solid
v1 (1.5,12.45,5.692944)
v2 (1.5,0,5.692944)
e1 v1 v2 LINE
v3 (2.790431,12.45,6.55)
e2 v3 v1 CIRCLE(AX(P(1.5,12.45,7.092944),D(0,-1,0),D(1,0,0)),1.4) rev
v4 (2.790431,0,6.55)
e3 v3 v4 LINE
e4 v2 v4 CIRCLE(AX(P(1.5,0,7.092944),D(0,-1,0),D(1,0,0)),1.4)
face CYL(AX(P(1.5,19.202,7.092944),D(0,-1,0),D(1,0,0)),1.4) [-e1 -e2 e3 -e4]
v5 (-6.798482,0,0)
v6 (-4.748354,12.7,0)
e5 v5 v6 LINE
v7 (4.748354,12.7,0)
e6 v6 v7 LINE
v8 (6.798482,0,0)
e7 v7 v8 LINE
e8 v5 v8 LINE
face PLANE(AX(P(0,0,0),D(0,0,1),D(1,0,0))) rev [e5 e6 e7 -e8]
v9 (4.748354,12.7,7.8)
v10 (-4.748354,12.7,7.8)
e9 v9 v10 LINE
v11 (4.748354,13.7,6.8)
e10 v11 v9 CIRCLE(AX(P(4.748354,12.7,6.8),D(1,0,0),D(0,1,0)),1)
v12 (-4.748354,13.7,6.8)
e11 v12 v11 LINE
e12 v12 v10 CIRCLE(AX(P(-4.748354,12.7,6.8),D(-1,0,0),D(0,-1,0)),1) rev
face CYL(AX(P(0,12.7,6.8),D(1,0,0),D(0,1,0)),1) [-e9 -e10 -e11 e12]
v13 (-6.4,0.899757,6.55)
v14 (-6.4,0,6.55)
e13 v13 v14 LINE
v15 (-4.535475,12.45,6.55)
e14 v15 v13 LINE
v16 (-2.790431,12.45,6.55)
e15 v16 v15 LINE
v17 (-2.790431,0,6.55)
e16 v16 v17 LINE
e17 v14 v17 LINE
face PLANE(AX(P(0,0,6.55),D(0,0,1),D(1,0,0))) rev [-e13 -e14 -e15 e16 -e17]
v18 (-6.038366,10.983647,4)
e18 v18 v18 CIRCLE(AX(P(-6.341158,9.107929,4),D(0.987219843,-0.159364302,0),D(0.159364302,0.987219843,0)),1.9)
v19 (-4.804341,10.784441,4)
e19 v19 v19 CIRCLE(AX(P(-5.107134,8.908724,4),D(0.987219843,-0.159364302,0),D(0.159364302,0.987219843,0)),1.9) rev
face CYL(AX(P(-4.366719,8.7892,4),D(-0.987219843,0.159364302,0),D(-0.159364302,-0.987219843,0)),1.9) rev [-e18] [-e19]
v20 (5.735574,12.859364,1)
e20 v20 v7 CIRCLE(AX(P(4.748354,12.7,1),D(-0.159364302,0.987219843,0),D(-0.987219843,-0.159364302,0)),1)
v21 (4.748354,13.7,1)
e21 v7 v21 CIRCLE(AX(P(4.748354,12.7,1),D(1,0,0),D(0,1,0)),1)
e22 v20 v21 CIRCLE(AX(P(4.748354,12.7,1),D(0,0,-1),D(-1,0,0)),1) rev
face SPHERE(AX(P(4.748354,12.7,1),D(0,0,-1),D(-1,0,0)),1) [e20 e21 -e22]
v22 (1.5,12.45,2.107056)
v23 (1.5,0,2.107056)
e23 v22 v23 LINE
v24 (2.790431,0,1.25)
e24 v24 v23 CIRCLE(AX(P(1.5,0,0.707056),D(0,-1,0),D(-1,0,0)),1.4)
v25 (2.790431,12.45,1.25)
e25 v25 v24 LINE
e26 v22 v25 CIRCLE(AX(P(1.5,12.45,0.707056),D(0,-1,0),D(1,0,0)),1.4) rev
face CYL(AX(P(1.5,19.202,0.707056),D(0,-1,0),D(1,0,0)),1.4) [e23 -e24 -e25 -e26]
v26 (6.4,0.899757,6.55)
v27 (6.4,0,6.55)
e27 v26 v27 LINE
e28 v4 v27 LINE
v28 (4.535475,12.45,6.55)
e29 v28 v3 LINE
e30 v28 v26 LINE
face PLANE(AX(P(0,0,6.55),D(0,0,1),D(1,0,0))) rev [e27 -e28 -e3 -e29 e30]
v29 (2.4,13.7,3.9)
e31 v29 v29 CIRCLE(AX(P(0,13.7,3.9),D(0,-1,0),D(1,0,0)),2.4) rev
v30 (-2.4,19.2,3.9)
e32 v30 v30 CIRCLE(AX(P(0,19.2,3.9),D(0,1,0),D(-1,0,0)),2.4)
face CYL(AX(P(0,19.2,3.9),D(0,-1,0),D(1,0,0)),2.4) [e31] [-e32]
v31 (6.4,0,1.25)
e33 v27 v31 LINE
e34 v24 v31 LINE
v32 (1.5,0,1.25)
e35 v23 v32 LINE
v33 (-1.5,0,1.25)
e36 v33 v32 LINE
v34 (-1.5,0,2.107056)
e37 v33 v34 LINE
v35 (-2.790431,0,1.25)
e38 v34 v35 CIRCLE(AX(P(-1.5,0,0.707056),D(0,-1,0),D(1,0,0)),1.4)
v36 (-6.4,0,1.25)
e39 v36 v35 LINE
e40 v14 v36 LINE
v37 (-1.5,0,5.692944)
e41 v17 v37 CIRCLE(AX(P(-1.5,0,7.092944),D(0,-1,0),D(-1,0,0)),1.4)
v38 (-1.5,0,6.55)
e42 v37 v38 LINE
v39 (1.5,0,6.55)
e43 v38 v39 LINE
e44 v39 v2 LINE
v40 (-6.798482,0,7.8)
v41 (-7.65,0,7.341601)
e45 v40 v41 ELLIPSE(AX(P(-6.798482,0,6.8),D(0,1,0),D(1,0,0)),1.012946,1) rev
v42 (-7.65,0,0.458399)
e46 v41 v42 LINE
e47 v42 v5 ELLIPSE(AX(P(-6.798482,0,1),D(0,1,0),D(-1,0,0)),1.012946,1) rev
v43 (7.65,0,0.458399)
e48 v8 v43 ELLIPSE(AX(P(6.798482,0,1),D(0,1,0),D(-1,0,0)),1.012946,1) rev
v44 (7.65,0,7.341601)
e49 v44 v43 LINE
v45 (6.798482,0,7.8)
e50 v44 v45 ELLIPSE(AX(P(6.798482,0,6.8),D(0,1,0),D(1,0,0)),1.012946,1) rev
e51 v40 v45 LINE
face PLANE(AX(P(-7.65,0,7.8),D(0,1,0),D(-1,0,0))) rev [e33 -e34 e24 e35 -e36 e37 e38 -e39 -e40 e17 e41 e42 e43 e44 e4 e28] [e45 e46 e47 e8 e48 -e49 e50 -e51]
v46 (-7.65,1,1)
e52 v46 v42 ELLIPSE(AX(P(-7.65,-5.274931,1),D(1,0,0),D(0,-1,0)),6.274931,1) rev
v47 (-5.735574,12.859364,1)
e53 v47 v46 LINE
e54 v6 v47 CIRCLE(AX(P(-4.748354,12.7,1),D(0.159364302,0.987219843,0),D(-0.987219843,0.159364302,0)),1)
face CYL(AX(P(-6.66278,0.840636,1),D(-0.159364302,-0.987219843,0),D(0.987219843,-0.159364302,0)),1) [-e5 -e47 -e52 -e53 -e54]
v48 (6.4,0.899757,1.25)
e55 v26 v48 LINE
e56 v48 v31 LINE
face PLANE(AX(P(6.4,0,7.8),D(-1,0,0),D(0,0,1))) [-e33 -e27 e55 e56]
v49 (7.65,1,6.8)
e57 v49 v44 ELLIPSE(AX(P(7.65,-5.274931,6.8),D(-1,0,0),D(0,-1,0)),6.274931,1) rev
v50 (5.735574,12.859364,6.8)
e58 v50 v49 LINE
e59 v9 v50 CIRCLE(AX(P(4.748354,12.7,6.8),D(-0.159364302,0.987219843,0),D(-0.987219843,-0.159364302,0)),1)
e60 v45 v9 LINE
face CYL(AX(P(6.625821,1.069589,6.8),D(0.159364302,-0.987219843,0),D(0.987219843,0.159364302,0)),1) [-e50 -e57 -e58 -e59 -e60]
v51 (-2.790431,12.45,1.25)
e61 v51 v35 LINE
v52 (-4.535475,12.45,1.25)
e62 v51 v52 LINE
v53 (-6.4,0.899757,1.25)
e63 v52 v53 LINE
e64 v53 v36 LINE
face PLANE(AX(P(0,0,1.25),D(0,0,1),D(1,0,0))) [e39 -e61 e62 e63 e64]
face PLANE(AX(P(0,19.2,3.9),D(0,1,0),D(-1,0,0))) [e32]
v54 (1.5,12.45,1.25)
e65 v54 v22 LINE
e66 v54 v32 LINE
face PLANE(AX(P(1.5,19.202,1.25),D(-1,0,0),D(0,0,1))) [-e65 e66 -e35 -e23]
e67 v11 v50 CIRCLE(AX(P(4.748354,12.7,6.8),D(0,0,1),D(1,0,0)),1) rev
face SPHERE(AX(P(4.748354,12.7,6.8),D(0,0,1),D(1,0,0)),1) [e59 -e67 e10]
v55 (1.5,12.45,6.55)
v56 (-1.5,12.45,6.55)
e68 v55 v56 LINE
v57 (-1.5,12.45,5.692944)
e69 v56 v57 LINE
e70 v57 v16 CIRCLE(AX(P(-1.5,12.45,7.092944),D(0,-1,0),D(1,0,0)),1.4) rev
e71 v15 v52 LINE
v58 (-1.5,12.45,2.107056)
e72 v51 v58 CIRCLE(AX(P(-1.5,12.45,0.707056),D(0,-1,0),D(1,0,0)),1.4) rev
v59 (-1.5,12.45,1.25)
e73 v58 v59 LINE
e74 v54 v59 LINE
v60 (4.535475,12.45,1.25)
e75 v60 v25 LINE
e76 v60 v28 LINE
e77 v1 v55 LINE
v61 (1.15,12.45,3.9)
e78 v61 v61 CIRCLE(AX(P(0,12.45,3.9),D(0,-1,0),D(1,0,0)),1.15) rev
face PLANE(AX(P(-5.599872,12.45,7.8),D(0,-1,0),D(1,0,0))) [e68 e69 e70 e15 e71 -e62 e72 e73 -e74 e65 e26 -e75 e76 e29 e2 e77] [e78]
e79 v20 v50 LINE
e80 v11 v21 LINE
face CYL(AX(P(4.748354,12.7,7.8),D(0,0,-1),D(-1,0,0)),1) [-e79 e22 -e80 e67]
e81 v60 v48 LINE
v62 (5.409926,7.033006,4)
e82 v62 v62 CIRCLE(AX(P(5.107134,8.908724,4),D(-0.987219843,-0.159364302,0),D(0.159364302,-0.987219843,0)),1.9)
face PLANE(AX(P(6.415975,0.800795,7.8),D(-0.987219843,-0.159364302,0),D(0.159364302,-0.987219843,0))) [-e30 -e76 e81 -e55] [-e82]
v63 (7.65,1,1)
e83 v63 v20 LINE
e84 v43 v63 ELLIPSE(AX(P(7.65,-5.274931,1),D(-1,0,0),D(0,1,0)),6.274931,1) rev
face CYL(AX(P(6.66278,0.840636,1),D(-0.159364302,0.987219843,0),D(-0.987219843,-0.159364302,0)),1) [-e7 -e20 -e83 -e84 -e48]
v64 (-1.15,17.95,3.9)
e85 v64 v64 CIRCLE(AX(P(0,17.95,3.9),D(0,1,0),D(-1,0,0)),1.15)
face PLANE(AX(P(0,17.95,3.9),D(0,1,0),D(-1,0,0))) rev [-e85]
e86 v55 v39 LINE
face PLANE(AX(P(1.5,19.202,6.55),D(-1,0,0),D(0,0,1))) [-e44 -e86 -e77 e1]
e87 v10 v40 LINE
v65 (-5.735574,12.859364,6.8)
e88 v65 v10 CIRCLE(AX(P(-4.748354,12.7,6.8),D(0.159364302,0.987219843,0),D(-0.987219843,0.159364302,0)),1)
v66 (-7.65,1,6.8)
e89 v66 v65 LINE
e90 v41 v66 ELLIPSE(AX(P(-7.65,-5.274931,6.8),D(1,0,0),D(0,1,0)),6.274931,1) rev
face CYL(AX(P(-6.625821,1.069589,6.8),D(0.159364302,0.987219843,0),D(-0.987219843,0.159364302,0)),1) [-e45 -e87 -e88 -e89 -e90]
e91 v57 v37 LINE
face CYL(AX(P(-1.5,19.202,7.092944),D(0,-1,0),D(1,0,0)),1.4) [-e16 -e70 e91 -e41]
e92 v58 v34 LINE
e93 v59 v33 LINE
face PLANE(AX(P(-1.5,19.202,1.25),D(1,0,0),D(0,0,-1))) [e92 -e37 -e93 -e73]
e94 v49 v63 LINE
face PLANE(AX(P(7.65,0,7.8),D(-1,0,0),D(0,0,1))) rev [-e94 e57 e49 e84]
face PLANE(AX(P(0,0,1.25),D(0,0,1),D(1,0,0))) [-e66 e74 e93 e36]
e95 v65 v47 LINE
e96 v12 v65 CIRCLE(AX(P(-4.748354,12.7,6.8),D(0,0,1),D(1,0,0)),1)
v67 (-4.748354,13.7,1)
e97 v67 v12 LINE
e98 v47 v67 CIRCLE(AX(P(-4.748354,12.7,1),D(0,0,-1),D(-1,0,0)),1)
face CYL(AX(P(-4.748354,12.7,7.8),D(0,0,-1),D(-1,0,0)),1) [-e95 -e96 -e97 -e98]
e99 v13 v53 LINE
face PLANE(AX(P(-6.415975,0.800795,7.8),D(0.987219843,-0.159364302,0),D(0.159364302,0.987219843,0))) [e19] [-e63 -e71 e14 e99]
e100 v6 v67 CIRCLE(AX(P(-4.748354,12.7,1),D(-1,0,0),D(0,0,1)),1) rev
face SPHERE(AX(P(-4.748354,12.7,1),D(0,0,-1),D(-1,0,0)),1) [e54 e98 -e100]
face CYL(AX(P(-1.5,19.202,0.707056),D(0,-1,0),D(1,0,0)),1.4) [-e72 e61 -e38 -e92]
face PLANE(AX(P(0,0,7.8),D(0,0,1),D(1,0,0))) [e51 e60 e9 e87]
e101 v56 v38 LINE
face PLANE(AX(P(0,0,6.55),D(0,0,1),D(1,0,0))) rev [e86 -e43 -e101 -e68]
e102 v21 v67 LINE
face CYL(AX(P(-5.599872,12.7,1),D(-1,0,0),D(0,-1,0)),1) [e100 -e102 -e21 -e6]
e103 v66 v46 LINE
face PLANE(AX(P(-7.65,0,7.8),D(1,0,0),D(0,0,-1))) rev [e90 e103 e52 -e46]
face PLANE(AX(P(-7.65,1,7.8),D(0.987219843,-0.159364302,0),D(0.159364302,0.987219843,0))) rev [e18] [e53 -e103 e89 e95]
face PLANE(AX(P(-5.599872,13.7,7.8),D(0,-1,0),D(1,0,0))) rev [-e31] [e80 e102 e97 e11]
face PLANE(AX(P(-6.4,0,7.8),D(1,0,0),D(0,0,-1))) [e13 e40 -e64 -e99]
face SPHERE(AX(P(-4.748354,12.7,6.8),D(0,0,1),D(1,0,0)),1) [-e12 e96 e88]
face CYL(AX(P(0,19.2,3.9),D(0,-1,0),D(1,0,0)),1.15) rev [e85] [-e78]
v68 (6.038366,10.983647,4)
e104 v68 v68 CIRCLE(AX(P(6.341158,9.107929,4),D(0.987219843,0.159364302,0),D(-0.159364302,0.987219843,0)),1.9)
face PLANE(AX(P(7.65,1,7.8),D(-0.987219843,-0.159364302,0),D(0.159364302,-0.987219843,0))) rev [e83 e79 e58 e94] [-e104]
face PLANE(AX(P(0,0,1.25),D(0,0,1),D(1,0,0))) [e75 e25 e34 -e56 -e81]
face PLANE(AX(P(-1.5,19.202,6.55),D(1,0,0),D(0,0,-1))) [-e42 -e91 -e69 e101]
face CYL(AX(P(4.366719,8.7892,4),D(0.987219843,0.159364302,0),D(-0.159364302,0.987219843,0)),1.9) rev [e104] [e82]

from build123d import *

# Parameters (mm, degrees)
BOSS_EXTRUDE1_DEPTH = 7.8
FILLET1_R           = 1
SKETCH3_R           = 2.4
BOSS_EXTRUDE2_DEPTH = 5.5
SHELL3_START        = 1.25
SHELL3_DEPTH        = 5.3
SHELL3_START_2      = 12.45
SHELL3_2_OUTLINE_R  = 1.15
SHELL3_2_DEPTH      = 5.5
SKETCH7_R           = 1.9
CUT_EXTRUDE5_DEPTH  = 2
BOSS_EXTRUDE3_REACH = 24.091


with BuildPart() as part:
    # Sketch2 → Boss-Extrude1 (new body)
    with BuildSketch(Plane.XY):
        Polygon((-7.65, 0), (7.65, 0), (7.65, 1), (5.599872407, 13.7), (2.399872407, 13.7), (-2.399872407, 13.7), (-5.599872407, 13.7), (-7.65, 1), align=None)
    extrude(amount=BOSS_EXTRUDE1_DEPTH)

    # Fillet1
    fillet1_edges = [part.edges().sort_by_distance(p)[0] for p in [
        (5.599872407, 13.7, 3.9),
        (0, 13.7, 7.8),
        (-5.599872407, 13.7, 3.9),
        (0, 13.7, 0),
        (6.624936203, 7.35, 0),
        (6.624936203, 7.35, 7.8),
        (-6.624936203, 7.35, 7.8),
        (-6.624936203, 7.35, 0),
    ]]
    fillet(fillet1_edges, radius=FILLET1_R)

    # Sketch3 → Boss-Extrude2 (add)
    with BuildSketch(Plane(origin=(0, 13.7, 0), x_dir=(1, 0, 0), z_dir=(0, 1, 0))):
        with Locations((0, -3.9)):
            Circle(SKETCH3_R)
    extrude(amount=BOSS_EXTRUDE2_DEPTH)

    # Shell3: read off the stored shape, not the designer's step
    # Shell3 outline → Shell3 (cut)
    with BuildSketch(Plane.XY.offset(SHELL3_START)):
        Polygon((6.4, 0), (6.4, 0.899756749), (4.535474615, 12.45), (-4.535474615, 12.45), (-6.4, 0.899756749), (-6.4, 0), align=None)
    extrude(amount=SHELL3_DEPTH, mode=Mode.SUBTRACT)

    # Shell3 2 outline → Shell3 2 (cut)
    with BuildSketch(Plane(origin=(0, 0, 0), x_dir=(1, 0, 0), z_dir=(0, 1, 0)).offset(SHELL3_START_2)):
        with Locations((0, -3.9)):
            Circle(SHELL3_2_OUTLINE_R)
    extrude(amount=SHELL3_2_DEPTH, mode=Mode.SUBTRACT)

    # Sketch7 → Cut-Extrude5 (cut)
    with BuildSketch(Plane(origin=(7.613040698, 1.228953134, 0), x_dir=(0, 0, -1), z_dir=(0.987219843348776, 0.15936430245954794, 0))):
        with Locations(Location((-4, 7.98097386, 0), (0, 0, 90))):
            Circle(SKETCH7_R)
    cut_extrude5 = extrude(amount=-CUT_EXTRUDE5_DEPTH, mode=Mode.SUBTRACT)

    # Mirror1: Cut-Extrude5 across plane
    add(cut_extrude5.mirror(Plane(origin=(0, 0, 0), x_dir=(0, 0, 1), z_dir=(1, 0, 0))), mode=Mode.SUBTRACT)

    # Sketch8 → Boss-Extrude3 (add, up to next)
    with BuildSketch(Plane.XZ, mode=Mode.PRIVATE) as boss_extrude3_sk1:
        with BuildLine():
            Line((1.5, 6.55), (1.5, 5.692944235))
            ThreePointArc((1.5, 5.692944235), (2.274557316, 5.926727718), (2.790430764, 6.55))
            Line((2.790430764, 6.55), (1.5, 6.55))
        make_face()
    boss_extrude3_tool1 = extrude(boss_extrude3_sk1.sketch, amount=-BOSS_EXTRUDE3_REACH, mode=Mode.PRIVATE) - part.part
    # Sketch8 → Boss-Extrude3 (add, up to next)
    with BuildSketch(Plane.XZ, mode=Mode.PRIVATE) as boss_extrude3_sk2:
        with BuildLine():
            Line((-1.5, 6.55), (-1.5, 5.692944235))
            ThreePointArc((-1.5, 5.692944235), (-2.274557316, 5.926727718), (-2.790430764, 6.55))
            Line((-2.790430764, 6.55), (-1.5, 6.55))
        make_face()
    boss_extrude3_tool2 = extrude(boss_extrude3_sk2.sketch, amount=-BOSS_EXTRUDE3_REACH, mode=Mode.PRIVATE) - part.part
    # Sketch8 → Boss-Extrude3 (add, up to next)
    with BuildSketch(Plane.XZ, mode=Mode.PRIVATE) as boss_extrude3_sk3:
        with BuildLine():
            Line((1.5, 1.25), (1.5, 2.107055765))
            ThreePointArc((1.5, 2.107055765), (2.274557316, 1.873272282), (2.790430764, 1.25))
            Line((2.790430764, 1.25), (1.5, 1.25))
        make_face()
    boss_extrude3_tool3 = extrude(boss_extrude3_sk3.sketch, amount=-BOSS_EXTRUDE3_REACH, mode=Mode.PRIVATE) - part.part
    # Sketch8 → Boss-Extrude3 (add, up to next)
    with BuildSketch(Plane.XZ, mode=Mode.PRIVATE) as boss_extrude3_sk4:
        with BuildLine():
            Line((-1.5, 1.25), (-1.5, 2.107055765))
            ThreePointArc((-1.5, 2.107055765), (-2.274557316, 1.873272282), (-2.790430764, 1.25))
            Line((-2.790430764, 1.25), (-1.5, 1.25))
        make_face()
    boss_extrude3_tool4 = extrude(boss_extrude3_sk4.sketch, amount=-BOSS_EXTRUDE3_REACH, mode=Mode.PRIVATE) - part.part
    add(boss_extrude3_tool1.solids().sort_by_distance((2.012361, 0, 6.196212))[0])
    add(boss_extrude3_tool2.solids().sort_by_distance((-2.012361, 0, 6.196212))[0])
    add(boss_extrude3_tool3.solids().sort_by_distance((2.012361, 0, 1.603788))[0])
    add(boss_extrude3_tool4.solids().sort_by_distance((-2.012361, 0, 1.603788))[0])


solid = part.part
